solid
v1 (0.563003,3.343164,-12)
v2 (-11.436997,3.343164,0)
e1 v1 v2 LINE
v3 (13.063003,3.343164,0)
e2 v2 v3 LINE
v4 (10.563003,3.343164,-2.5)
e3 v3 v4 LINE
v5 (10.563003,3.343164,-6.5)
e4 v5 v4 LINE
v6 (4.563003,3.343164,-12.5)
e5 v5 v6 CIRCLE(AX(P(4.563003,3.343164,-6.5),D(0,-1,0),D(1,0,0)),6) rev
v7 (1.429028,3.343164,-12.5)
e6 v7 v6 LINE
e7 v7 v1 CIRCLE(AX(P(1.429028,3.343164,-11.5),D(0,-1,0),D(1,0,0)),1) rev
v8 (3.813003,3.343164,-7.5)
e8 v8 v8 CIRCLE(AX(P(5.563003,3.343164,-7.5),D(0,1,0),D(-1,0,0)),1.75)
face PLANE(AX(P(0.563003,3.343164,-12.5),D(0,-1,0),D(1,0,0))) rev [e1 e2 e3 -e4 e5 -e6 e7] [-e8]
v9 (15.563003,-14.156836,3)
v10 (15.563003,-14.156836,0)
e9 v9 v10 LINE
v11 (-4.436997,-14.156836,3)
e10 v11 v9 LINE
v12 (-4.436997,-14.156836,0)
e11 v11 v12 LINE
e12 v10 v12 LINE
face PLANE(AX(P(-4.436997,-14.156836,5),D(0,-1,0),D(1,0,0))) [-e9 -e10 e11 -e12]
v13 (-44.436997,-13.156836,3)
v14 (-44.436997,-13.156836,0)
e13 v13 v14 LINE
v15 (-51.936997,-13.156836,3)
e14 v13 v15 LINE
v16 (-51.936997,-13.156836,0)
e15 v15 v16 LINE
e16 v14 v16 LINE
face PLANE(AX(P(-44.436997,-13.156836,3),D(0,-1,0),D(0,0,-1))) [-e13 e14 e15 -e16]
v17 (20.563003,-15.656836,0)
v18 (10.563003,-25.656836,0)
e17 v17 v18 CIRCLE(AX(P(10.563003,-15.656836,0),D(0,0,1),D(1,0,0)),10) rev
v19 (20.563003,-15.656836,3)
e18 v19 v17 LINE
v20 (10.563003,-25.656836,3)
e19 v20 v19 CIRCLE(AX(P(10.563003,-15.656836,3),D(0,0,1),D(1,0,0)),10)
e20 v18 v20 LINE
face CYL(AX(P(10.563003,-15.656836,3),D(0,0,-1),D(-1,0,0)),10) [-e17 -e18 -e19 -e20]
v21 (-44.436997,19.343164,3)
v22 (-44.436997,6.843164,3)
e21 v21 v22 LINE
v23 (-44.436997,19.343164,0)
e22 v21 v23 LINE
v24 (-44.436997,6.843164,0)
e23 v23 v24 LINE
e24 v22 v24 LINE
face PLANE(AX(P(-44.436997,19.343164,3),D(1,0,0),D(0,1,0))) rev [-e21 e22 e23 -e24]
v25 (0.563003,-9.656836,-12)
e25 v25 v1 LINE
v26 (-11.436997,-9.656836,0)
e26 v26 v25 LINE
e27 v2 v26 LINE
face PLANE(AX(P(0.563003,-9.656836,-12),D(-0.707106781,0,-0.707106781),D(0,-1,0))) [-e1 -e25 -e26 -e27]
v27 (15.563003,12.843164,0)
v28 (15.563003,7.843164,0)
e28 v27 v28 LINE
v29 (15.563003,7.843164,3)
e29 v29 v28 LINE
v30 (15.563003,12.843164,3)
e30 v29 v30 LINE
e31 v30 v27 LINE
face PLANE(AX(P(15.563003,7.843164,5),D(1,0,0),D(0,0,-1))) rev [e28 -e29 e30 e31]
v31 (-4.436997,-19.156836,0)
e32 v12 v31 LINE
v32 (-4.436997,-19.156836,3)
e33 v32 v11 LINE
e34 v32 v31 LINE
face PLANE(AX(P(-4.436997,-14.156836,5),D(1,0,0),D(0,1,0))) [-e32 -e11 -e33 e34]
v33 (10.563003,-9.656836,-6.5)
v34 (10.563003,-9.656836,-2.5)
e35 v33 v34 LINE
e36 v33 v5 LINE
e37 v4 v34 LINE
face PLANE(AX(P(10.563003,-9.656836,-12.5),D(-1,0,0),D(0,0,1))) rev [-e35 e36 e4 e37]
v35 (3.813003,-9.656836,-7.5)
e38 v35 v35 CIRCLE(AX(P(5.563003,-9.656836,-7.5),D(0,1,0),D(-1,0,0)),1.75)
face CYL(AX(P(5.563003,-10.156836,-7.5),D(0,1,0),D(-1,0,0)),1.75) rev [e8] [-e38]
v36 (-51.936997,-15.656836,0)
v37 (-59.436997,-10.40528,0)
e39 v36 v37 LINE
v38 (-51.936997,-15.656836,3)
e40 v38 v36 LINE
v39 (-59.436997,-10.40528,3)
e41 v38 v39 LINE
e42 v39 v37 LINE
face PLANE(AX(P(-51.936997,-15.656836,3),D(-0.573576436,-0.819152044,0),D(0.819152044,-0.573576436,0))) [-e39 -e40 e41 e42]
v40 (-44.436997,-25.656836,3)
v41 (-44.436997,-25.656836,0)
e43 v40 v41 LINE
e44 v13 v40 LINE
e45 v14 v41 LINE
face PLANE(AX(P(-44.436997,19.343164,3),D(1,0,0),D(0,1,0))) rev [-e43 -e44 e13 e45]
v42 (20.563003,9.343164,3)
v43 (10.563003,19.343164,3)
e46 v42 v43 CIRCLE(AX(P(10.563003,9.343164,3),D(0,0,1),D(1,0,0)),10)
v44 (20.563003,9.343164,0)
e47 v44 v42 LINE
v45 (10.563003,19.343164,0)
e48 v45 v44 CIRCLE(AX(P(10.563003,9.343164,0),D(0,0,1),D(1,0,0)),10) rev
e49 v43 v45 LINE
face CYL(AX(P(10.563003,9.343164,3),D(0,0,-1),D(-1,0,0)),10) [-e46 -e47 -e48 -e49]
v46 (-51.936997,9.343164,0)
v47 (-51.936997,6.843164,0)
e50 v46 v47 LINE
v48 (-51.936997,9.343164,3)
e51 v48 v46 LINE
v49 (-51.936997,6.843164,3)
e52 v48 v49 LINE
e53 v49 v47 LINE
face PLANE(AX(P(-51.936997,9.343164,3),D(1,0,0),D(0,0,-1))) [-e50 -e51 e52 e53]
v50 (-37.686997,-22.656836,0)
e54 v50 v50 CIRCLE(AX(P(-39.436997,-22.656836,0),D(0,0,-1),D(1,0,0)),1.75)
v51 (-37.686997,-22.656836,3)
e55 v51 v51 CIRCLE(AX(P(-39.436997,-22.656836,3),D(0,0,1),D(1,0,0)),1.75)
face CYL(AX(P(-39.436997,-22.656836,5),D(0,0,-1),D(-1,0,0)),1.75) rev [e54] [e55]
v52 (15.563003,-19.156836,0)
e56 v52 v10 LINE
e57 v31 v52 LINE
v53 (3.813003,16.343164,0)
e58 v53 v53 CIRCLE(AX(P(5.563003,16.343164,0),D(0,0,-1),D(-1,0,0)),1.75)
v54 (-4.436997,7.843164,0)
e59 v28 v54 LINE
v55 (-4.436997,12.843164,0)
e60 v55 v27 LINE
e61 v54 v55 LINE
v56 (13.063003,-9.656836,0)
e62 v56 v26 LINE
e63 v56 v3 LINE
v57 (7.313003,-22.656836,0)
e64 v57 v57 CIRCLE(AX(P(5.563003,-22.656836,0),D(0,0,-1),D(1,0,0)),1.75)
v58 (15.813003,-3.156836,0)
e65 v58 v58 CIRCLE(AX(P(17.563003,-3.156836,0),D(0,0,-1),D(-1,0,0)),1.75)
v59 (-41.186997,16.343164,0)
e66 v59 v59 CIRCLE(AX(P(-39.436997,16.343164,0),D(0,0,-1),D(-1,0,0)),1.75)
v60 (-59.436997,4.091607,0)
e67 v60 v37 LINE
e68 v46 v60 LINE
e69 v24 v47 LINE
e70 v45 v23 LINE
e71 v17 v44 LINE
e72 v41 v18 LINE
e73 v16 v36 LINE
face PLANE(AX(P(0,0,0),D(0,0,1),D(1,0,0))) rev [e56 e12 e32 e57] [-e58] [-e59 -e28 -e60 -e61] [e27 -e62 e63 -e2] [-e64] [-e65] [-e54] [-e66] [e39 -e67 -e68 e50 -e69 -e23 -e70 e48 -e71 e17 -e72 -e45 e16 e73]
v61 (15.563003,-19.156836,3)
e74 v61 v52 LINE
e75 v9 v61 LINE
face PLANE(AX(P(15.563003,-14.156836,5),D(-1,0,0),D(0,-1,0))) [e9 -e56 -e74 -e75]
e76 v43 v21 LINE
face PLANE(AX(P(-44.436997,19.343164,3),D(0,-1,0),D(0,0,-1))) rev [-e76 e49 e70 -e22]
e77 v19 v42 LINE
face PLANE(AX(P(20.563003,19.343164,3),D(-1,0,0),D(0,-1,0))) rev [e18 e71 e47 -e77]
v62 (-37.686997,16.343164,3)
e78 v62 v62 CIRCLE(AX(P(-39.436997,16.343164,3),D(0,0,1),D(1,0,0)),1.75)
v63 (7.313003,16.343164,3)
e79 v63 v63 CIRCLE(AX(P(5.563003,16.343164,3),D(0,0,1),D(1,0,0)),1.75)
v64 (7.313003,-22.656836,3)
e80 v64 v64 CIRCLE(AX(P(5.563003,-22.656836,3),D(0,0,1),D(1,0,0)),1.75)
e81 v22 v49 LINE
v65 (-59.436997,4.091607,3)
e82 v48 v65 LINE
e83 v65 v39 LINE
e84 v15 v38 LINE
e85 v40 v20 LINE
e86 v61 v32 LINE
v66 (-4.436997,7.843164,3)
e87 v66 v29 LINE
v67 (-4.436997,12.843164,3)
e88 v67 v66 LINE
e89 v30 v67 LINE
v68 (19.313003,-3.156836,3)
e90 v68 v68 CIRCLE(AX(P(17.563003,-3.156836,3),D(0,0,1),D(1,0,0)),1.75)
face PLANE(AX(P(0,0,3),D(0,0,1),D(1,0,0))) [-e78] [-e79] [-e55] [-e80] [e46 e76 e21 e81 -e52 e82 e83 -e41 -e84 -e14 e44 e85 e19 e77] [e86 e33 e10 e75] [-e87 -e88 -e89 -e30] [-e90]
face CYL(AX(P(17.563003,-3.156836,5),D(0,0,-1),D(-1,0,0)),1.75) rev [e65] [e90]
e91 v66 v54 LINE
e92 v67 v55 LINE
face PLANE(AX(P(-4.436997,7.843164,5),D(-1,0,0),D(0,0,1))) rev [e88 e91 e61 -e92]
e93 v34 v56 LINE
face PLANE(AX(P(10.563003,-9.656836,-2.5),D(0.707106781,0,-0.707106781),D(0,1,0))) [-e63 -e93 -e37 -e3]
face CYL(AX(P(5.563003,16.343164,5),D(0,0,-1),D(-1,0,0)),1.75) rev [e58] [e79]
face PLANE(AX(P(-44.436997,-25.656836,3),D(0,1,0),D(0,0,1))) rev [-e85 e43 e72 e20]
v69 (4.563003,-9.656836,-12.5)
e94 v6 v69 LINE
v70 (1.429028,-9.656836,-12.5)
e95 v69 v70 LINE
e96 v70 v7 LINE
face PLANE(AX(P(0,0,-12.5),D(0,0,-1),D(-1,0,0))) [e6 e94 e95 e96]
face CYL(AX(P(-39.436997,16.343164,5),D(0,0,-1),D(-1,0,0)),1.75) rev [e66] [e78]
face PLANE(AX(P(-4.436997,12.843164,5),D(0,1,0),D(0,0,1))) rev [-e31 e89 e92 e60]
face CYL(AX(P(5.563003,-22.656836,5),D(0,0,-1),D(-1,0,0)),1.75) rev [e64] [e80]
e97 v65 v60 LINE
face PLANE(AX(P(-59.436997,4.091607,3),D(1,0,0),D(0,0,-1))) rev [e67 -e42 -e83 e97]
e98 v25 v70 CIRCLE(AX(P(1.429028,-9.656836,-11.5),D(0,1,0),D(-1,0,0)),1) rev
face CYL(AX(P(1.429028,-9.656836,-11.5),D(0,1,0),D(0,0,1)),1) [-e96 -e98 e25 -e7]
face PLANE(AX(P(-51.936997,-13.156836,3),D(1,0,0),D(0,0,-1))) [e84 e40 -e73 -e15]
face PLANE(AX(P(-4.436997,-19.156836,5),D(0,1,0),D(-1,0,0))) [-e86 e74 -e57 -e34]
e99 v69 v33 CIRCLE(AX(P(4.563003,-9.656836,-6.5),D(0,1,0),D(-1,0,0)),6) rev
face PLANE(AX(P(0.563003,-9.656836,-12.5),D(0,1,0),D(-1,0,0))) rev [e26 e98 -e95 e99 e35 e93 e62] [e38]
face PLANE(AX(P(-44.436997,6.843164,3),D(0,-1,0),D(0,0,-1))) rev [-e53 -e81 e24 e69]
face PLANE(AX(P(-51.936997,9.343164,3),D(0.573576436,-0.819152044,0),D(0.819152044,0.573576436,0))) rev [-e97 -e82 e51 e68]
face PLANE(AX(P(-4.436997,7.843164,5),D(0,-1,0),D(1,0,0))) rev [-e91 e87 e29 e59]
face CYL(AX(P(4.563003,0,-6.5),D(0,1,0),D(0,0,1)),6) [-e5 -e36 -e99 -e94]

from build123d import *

# Parameters (mm, degrees)
SKETCH1_W           = 65
SKETCH1_H           = 45
BOSS_EXTRUDE1_DEPTH = 3
SKETCH2_W           = 10
SKETCH2_H           = 13
BOSS_EXTRUDE2_DEPTH = 12.5
SKETCH3_R           = 1.75
CUT_EXTRUDE1_DEPTH  = 13.5
FILLET1_R           = 6
CHAMFER1_SIZE       = 12
FILLET3_R           = 1
SKETCH4_W           = 20
SKETCH4_H           = 5
CUT_EXTRUDE3_DEPTH  = 5
FILLET4_R           = 10
CHAMFER2_SIZE       = 2.5
SKETCH7_R           = 1.75
CUT_EXTRUDE4_DEPTH  = 5
BOSS_EXTRUDE4_DEPTH = 3


with BuildPart() as part:
    # Sketch1 → Boss-Extrude1 (new body)
    with BuildSketch(Plane.XY):
        with Locations((-11.936997319, -3.156836461)):
            Rectangle(SKETCH1_W, SKETCH1_H)
    extrude(amount=BOSS_EXTRUDE1_DEPTH)

    # Sketch2 → Boss-Extrude2 (add)
    with BuildSketch(Plane(origin=(0, 0, 0), x_dir=(-1, 0, 0), z_dir=(0, 0, -1))):
        with Locations((-5.563002681, -3.156836461)):
            Rectangle(SKETCH2_W, SKETCH2_H)
    extrude(amount=BOSS_EXTRUDE2_DEPTH)

    # Sketch3 → Cut-Extrude1 (cut)
    with BuildSketch(Plane(origin=(0, 3.343163539, 0), x_dir=(1, 0, 0), z_dir=(0, 1, 0))):
        with Locations(Location((5.563002681, 7.5, 0), (0, 0, 180))):
            Circle(SKETCH3_R)
    extrude(amount=-CUT_EXTRUDE1_DEPTH, mode=Mode.SUBTRACT)

    # Fillet1
    fillet1_edges = [part.edges().sort_by_distance(p)[0] for p in [
        (10.563002681, -3.156836461, -12.5),
    ]]
    fillet(fillet1_edges, radius=FILLET1_R)

    # Chamfer1
    chamfer1_edges = [part.edges().sort_by_distance(p)[0] for p in [
        (0.563002681, -3.156836461, 0),
    ]]
    chamfer(chamfer1_edges, length=CHAMFER1_SIZE)

    # Fillet3
    # the kernel refuses this fillet: 1 mm, written as the material it takes off along each edge
    with BuildSketch(Plane(origin=(0.563002681, 5.508227048, -12.5), x_dir=(1, 0, 0), z_dir=(0, -1, 0))) as fillet3_piece_1:
        with BuildLine():
            CenterArc((0.866025404, 1), FILLET3_R, 210, 60)
            Line((0, 0.5), (-0.017320508, 0.49))
            ThreePointArc((-0.017320508, 0.49), (-0.02, 0.25), (-0.02, 0))
            Line((-0.02, 0), (0, -0.02))
            Line((0, -0.02), (0.866025404, -0.02))
            Line((0.866025404, -0.02), (0.866025404, 0))
        make_face()
    extrude(amount=17.330127019, mode=Mode.SUBTRACT)

    # Sketch4 → Cut-Extrude3 (cut)
    with BuildSketch(Plane(origin=(0, 0, 0), x_dir=(-1, 0, 0), z_dir=(0, 0, -1))):
        with Locations((-5.563002681, 10.343163539)):
            Rectangle(SKETCH4_W, SKETCH4_H)
    cut_extrude3 = extrude(amount=-CUT_EXTRUDE3_DEPTH, mode=Mode.SUBTRACT)

    # Mirror2: Cut-Extrude3 across plane
    add(cut_extrude3.mirror(Plane.ZX.offset(-3.156836461)), mode=Mode.SUBTRACT)

    # Fillet4
    fillet4_edges = [part.edges().sort_by_distance(p)[0] for p in [
        (20.563002681, 19.343163539, 1.5),
        (20.563002681, -25.656836461, 1.5),
    ]]
    fillet(fillet4_edges, radius=FILLET4_R)

    # Chamfer2
    chamfer2_edges = [part.edges().sort_by_distance(p)[0] for p in [
        (10.563002681, -3.156836461, 0),
    ]]
    chamfer(chamfer2_edges, length=CHAMFER2_SIZE)

    # Sketch7 → Cut-Extrude4 (cut)
    with BuildSketch(Plane(origin=(0, 0, 0), x_dir=(-1, 0, 0), z_dir=(0, 0, -1))):
        with Locations((-17.563002681, -3.156836461)):
            Circle(SKETCH7_R)
        with Locations((-5.563002681, 16.343163539)):
            Circle(SKETCH7_R)
        with Locations((39.436997319, 16.343163539)):
            Circle(SKETCH7_R)
        with Locations(Location((39.436997319, -22.656836461, 0), (0, 0, 180))):
            Circle(SKETCH7_R)
        with Locations(Location((-5.563002681, -22.656836461, 0), (0, 0, 180))):
            Circle(SKETCH7_R)
    extrude(amount=-CUT_EXTRUDE4_DEPTH, mode=Mode.SUBTRACT)

    # Sketch8 → Boss-Extrude4 (add)
    with BuildSketch(Plane(origin=(0, 0, 0), x_dir=(-1, 0, 0), z_dir=(0, 0, -1))):
        Polygon((44.436997319, 6.843163539), (51.936997319, 6.843163539), (51.936997319, 9.343163539), (59.436997319, 4.091607002), (59.436997319, -10.405279925), (51.936997319, -15.656836461), (51.936997319, -13.156836461), (44.436997319, -13.156836461), align=None)
    extrude(amount=-BOSS_EXTRUDE4_DEPTH)


solid = part.part
